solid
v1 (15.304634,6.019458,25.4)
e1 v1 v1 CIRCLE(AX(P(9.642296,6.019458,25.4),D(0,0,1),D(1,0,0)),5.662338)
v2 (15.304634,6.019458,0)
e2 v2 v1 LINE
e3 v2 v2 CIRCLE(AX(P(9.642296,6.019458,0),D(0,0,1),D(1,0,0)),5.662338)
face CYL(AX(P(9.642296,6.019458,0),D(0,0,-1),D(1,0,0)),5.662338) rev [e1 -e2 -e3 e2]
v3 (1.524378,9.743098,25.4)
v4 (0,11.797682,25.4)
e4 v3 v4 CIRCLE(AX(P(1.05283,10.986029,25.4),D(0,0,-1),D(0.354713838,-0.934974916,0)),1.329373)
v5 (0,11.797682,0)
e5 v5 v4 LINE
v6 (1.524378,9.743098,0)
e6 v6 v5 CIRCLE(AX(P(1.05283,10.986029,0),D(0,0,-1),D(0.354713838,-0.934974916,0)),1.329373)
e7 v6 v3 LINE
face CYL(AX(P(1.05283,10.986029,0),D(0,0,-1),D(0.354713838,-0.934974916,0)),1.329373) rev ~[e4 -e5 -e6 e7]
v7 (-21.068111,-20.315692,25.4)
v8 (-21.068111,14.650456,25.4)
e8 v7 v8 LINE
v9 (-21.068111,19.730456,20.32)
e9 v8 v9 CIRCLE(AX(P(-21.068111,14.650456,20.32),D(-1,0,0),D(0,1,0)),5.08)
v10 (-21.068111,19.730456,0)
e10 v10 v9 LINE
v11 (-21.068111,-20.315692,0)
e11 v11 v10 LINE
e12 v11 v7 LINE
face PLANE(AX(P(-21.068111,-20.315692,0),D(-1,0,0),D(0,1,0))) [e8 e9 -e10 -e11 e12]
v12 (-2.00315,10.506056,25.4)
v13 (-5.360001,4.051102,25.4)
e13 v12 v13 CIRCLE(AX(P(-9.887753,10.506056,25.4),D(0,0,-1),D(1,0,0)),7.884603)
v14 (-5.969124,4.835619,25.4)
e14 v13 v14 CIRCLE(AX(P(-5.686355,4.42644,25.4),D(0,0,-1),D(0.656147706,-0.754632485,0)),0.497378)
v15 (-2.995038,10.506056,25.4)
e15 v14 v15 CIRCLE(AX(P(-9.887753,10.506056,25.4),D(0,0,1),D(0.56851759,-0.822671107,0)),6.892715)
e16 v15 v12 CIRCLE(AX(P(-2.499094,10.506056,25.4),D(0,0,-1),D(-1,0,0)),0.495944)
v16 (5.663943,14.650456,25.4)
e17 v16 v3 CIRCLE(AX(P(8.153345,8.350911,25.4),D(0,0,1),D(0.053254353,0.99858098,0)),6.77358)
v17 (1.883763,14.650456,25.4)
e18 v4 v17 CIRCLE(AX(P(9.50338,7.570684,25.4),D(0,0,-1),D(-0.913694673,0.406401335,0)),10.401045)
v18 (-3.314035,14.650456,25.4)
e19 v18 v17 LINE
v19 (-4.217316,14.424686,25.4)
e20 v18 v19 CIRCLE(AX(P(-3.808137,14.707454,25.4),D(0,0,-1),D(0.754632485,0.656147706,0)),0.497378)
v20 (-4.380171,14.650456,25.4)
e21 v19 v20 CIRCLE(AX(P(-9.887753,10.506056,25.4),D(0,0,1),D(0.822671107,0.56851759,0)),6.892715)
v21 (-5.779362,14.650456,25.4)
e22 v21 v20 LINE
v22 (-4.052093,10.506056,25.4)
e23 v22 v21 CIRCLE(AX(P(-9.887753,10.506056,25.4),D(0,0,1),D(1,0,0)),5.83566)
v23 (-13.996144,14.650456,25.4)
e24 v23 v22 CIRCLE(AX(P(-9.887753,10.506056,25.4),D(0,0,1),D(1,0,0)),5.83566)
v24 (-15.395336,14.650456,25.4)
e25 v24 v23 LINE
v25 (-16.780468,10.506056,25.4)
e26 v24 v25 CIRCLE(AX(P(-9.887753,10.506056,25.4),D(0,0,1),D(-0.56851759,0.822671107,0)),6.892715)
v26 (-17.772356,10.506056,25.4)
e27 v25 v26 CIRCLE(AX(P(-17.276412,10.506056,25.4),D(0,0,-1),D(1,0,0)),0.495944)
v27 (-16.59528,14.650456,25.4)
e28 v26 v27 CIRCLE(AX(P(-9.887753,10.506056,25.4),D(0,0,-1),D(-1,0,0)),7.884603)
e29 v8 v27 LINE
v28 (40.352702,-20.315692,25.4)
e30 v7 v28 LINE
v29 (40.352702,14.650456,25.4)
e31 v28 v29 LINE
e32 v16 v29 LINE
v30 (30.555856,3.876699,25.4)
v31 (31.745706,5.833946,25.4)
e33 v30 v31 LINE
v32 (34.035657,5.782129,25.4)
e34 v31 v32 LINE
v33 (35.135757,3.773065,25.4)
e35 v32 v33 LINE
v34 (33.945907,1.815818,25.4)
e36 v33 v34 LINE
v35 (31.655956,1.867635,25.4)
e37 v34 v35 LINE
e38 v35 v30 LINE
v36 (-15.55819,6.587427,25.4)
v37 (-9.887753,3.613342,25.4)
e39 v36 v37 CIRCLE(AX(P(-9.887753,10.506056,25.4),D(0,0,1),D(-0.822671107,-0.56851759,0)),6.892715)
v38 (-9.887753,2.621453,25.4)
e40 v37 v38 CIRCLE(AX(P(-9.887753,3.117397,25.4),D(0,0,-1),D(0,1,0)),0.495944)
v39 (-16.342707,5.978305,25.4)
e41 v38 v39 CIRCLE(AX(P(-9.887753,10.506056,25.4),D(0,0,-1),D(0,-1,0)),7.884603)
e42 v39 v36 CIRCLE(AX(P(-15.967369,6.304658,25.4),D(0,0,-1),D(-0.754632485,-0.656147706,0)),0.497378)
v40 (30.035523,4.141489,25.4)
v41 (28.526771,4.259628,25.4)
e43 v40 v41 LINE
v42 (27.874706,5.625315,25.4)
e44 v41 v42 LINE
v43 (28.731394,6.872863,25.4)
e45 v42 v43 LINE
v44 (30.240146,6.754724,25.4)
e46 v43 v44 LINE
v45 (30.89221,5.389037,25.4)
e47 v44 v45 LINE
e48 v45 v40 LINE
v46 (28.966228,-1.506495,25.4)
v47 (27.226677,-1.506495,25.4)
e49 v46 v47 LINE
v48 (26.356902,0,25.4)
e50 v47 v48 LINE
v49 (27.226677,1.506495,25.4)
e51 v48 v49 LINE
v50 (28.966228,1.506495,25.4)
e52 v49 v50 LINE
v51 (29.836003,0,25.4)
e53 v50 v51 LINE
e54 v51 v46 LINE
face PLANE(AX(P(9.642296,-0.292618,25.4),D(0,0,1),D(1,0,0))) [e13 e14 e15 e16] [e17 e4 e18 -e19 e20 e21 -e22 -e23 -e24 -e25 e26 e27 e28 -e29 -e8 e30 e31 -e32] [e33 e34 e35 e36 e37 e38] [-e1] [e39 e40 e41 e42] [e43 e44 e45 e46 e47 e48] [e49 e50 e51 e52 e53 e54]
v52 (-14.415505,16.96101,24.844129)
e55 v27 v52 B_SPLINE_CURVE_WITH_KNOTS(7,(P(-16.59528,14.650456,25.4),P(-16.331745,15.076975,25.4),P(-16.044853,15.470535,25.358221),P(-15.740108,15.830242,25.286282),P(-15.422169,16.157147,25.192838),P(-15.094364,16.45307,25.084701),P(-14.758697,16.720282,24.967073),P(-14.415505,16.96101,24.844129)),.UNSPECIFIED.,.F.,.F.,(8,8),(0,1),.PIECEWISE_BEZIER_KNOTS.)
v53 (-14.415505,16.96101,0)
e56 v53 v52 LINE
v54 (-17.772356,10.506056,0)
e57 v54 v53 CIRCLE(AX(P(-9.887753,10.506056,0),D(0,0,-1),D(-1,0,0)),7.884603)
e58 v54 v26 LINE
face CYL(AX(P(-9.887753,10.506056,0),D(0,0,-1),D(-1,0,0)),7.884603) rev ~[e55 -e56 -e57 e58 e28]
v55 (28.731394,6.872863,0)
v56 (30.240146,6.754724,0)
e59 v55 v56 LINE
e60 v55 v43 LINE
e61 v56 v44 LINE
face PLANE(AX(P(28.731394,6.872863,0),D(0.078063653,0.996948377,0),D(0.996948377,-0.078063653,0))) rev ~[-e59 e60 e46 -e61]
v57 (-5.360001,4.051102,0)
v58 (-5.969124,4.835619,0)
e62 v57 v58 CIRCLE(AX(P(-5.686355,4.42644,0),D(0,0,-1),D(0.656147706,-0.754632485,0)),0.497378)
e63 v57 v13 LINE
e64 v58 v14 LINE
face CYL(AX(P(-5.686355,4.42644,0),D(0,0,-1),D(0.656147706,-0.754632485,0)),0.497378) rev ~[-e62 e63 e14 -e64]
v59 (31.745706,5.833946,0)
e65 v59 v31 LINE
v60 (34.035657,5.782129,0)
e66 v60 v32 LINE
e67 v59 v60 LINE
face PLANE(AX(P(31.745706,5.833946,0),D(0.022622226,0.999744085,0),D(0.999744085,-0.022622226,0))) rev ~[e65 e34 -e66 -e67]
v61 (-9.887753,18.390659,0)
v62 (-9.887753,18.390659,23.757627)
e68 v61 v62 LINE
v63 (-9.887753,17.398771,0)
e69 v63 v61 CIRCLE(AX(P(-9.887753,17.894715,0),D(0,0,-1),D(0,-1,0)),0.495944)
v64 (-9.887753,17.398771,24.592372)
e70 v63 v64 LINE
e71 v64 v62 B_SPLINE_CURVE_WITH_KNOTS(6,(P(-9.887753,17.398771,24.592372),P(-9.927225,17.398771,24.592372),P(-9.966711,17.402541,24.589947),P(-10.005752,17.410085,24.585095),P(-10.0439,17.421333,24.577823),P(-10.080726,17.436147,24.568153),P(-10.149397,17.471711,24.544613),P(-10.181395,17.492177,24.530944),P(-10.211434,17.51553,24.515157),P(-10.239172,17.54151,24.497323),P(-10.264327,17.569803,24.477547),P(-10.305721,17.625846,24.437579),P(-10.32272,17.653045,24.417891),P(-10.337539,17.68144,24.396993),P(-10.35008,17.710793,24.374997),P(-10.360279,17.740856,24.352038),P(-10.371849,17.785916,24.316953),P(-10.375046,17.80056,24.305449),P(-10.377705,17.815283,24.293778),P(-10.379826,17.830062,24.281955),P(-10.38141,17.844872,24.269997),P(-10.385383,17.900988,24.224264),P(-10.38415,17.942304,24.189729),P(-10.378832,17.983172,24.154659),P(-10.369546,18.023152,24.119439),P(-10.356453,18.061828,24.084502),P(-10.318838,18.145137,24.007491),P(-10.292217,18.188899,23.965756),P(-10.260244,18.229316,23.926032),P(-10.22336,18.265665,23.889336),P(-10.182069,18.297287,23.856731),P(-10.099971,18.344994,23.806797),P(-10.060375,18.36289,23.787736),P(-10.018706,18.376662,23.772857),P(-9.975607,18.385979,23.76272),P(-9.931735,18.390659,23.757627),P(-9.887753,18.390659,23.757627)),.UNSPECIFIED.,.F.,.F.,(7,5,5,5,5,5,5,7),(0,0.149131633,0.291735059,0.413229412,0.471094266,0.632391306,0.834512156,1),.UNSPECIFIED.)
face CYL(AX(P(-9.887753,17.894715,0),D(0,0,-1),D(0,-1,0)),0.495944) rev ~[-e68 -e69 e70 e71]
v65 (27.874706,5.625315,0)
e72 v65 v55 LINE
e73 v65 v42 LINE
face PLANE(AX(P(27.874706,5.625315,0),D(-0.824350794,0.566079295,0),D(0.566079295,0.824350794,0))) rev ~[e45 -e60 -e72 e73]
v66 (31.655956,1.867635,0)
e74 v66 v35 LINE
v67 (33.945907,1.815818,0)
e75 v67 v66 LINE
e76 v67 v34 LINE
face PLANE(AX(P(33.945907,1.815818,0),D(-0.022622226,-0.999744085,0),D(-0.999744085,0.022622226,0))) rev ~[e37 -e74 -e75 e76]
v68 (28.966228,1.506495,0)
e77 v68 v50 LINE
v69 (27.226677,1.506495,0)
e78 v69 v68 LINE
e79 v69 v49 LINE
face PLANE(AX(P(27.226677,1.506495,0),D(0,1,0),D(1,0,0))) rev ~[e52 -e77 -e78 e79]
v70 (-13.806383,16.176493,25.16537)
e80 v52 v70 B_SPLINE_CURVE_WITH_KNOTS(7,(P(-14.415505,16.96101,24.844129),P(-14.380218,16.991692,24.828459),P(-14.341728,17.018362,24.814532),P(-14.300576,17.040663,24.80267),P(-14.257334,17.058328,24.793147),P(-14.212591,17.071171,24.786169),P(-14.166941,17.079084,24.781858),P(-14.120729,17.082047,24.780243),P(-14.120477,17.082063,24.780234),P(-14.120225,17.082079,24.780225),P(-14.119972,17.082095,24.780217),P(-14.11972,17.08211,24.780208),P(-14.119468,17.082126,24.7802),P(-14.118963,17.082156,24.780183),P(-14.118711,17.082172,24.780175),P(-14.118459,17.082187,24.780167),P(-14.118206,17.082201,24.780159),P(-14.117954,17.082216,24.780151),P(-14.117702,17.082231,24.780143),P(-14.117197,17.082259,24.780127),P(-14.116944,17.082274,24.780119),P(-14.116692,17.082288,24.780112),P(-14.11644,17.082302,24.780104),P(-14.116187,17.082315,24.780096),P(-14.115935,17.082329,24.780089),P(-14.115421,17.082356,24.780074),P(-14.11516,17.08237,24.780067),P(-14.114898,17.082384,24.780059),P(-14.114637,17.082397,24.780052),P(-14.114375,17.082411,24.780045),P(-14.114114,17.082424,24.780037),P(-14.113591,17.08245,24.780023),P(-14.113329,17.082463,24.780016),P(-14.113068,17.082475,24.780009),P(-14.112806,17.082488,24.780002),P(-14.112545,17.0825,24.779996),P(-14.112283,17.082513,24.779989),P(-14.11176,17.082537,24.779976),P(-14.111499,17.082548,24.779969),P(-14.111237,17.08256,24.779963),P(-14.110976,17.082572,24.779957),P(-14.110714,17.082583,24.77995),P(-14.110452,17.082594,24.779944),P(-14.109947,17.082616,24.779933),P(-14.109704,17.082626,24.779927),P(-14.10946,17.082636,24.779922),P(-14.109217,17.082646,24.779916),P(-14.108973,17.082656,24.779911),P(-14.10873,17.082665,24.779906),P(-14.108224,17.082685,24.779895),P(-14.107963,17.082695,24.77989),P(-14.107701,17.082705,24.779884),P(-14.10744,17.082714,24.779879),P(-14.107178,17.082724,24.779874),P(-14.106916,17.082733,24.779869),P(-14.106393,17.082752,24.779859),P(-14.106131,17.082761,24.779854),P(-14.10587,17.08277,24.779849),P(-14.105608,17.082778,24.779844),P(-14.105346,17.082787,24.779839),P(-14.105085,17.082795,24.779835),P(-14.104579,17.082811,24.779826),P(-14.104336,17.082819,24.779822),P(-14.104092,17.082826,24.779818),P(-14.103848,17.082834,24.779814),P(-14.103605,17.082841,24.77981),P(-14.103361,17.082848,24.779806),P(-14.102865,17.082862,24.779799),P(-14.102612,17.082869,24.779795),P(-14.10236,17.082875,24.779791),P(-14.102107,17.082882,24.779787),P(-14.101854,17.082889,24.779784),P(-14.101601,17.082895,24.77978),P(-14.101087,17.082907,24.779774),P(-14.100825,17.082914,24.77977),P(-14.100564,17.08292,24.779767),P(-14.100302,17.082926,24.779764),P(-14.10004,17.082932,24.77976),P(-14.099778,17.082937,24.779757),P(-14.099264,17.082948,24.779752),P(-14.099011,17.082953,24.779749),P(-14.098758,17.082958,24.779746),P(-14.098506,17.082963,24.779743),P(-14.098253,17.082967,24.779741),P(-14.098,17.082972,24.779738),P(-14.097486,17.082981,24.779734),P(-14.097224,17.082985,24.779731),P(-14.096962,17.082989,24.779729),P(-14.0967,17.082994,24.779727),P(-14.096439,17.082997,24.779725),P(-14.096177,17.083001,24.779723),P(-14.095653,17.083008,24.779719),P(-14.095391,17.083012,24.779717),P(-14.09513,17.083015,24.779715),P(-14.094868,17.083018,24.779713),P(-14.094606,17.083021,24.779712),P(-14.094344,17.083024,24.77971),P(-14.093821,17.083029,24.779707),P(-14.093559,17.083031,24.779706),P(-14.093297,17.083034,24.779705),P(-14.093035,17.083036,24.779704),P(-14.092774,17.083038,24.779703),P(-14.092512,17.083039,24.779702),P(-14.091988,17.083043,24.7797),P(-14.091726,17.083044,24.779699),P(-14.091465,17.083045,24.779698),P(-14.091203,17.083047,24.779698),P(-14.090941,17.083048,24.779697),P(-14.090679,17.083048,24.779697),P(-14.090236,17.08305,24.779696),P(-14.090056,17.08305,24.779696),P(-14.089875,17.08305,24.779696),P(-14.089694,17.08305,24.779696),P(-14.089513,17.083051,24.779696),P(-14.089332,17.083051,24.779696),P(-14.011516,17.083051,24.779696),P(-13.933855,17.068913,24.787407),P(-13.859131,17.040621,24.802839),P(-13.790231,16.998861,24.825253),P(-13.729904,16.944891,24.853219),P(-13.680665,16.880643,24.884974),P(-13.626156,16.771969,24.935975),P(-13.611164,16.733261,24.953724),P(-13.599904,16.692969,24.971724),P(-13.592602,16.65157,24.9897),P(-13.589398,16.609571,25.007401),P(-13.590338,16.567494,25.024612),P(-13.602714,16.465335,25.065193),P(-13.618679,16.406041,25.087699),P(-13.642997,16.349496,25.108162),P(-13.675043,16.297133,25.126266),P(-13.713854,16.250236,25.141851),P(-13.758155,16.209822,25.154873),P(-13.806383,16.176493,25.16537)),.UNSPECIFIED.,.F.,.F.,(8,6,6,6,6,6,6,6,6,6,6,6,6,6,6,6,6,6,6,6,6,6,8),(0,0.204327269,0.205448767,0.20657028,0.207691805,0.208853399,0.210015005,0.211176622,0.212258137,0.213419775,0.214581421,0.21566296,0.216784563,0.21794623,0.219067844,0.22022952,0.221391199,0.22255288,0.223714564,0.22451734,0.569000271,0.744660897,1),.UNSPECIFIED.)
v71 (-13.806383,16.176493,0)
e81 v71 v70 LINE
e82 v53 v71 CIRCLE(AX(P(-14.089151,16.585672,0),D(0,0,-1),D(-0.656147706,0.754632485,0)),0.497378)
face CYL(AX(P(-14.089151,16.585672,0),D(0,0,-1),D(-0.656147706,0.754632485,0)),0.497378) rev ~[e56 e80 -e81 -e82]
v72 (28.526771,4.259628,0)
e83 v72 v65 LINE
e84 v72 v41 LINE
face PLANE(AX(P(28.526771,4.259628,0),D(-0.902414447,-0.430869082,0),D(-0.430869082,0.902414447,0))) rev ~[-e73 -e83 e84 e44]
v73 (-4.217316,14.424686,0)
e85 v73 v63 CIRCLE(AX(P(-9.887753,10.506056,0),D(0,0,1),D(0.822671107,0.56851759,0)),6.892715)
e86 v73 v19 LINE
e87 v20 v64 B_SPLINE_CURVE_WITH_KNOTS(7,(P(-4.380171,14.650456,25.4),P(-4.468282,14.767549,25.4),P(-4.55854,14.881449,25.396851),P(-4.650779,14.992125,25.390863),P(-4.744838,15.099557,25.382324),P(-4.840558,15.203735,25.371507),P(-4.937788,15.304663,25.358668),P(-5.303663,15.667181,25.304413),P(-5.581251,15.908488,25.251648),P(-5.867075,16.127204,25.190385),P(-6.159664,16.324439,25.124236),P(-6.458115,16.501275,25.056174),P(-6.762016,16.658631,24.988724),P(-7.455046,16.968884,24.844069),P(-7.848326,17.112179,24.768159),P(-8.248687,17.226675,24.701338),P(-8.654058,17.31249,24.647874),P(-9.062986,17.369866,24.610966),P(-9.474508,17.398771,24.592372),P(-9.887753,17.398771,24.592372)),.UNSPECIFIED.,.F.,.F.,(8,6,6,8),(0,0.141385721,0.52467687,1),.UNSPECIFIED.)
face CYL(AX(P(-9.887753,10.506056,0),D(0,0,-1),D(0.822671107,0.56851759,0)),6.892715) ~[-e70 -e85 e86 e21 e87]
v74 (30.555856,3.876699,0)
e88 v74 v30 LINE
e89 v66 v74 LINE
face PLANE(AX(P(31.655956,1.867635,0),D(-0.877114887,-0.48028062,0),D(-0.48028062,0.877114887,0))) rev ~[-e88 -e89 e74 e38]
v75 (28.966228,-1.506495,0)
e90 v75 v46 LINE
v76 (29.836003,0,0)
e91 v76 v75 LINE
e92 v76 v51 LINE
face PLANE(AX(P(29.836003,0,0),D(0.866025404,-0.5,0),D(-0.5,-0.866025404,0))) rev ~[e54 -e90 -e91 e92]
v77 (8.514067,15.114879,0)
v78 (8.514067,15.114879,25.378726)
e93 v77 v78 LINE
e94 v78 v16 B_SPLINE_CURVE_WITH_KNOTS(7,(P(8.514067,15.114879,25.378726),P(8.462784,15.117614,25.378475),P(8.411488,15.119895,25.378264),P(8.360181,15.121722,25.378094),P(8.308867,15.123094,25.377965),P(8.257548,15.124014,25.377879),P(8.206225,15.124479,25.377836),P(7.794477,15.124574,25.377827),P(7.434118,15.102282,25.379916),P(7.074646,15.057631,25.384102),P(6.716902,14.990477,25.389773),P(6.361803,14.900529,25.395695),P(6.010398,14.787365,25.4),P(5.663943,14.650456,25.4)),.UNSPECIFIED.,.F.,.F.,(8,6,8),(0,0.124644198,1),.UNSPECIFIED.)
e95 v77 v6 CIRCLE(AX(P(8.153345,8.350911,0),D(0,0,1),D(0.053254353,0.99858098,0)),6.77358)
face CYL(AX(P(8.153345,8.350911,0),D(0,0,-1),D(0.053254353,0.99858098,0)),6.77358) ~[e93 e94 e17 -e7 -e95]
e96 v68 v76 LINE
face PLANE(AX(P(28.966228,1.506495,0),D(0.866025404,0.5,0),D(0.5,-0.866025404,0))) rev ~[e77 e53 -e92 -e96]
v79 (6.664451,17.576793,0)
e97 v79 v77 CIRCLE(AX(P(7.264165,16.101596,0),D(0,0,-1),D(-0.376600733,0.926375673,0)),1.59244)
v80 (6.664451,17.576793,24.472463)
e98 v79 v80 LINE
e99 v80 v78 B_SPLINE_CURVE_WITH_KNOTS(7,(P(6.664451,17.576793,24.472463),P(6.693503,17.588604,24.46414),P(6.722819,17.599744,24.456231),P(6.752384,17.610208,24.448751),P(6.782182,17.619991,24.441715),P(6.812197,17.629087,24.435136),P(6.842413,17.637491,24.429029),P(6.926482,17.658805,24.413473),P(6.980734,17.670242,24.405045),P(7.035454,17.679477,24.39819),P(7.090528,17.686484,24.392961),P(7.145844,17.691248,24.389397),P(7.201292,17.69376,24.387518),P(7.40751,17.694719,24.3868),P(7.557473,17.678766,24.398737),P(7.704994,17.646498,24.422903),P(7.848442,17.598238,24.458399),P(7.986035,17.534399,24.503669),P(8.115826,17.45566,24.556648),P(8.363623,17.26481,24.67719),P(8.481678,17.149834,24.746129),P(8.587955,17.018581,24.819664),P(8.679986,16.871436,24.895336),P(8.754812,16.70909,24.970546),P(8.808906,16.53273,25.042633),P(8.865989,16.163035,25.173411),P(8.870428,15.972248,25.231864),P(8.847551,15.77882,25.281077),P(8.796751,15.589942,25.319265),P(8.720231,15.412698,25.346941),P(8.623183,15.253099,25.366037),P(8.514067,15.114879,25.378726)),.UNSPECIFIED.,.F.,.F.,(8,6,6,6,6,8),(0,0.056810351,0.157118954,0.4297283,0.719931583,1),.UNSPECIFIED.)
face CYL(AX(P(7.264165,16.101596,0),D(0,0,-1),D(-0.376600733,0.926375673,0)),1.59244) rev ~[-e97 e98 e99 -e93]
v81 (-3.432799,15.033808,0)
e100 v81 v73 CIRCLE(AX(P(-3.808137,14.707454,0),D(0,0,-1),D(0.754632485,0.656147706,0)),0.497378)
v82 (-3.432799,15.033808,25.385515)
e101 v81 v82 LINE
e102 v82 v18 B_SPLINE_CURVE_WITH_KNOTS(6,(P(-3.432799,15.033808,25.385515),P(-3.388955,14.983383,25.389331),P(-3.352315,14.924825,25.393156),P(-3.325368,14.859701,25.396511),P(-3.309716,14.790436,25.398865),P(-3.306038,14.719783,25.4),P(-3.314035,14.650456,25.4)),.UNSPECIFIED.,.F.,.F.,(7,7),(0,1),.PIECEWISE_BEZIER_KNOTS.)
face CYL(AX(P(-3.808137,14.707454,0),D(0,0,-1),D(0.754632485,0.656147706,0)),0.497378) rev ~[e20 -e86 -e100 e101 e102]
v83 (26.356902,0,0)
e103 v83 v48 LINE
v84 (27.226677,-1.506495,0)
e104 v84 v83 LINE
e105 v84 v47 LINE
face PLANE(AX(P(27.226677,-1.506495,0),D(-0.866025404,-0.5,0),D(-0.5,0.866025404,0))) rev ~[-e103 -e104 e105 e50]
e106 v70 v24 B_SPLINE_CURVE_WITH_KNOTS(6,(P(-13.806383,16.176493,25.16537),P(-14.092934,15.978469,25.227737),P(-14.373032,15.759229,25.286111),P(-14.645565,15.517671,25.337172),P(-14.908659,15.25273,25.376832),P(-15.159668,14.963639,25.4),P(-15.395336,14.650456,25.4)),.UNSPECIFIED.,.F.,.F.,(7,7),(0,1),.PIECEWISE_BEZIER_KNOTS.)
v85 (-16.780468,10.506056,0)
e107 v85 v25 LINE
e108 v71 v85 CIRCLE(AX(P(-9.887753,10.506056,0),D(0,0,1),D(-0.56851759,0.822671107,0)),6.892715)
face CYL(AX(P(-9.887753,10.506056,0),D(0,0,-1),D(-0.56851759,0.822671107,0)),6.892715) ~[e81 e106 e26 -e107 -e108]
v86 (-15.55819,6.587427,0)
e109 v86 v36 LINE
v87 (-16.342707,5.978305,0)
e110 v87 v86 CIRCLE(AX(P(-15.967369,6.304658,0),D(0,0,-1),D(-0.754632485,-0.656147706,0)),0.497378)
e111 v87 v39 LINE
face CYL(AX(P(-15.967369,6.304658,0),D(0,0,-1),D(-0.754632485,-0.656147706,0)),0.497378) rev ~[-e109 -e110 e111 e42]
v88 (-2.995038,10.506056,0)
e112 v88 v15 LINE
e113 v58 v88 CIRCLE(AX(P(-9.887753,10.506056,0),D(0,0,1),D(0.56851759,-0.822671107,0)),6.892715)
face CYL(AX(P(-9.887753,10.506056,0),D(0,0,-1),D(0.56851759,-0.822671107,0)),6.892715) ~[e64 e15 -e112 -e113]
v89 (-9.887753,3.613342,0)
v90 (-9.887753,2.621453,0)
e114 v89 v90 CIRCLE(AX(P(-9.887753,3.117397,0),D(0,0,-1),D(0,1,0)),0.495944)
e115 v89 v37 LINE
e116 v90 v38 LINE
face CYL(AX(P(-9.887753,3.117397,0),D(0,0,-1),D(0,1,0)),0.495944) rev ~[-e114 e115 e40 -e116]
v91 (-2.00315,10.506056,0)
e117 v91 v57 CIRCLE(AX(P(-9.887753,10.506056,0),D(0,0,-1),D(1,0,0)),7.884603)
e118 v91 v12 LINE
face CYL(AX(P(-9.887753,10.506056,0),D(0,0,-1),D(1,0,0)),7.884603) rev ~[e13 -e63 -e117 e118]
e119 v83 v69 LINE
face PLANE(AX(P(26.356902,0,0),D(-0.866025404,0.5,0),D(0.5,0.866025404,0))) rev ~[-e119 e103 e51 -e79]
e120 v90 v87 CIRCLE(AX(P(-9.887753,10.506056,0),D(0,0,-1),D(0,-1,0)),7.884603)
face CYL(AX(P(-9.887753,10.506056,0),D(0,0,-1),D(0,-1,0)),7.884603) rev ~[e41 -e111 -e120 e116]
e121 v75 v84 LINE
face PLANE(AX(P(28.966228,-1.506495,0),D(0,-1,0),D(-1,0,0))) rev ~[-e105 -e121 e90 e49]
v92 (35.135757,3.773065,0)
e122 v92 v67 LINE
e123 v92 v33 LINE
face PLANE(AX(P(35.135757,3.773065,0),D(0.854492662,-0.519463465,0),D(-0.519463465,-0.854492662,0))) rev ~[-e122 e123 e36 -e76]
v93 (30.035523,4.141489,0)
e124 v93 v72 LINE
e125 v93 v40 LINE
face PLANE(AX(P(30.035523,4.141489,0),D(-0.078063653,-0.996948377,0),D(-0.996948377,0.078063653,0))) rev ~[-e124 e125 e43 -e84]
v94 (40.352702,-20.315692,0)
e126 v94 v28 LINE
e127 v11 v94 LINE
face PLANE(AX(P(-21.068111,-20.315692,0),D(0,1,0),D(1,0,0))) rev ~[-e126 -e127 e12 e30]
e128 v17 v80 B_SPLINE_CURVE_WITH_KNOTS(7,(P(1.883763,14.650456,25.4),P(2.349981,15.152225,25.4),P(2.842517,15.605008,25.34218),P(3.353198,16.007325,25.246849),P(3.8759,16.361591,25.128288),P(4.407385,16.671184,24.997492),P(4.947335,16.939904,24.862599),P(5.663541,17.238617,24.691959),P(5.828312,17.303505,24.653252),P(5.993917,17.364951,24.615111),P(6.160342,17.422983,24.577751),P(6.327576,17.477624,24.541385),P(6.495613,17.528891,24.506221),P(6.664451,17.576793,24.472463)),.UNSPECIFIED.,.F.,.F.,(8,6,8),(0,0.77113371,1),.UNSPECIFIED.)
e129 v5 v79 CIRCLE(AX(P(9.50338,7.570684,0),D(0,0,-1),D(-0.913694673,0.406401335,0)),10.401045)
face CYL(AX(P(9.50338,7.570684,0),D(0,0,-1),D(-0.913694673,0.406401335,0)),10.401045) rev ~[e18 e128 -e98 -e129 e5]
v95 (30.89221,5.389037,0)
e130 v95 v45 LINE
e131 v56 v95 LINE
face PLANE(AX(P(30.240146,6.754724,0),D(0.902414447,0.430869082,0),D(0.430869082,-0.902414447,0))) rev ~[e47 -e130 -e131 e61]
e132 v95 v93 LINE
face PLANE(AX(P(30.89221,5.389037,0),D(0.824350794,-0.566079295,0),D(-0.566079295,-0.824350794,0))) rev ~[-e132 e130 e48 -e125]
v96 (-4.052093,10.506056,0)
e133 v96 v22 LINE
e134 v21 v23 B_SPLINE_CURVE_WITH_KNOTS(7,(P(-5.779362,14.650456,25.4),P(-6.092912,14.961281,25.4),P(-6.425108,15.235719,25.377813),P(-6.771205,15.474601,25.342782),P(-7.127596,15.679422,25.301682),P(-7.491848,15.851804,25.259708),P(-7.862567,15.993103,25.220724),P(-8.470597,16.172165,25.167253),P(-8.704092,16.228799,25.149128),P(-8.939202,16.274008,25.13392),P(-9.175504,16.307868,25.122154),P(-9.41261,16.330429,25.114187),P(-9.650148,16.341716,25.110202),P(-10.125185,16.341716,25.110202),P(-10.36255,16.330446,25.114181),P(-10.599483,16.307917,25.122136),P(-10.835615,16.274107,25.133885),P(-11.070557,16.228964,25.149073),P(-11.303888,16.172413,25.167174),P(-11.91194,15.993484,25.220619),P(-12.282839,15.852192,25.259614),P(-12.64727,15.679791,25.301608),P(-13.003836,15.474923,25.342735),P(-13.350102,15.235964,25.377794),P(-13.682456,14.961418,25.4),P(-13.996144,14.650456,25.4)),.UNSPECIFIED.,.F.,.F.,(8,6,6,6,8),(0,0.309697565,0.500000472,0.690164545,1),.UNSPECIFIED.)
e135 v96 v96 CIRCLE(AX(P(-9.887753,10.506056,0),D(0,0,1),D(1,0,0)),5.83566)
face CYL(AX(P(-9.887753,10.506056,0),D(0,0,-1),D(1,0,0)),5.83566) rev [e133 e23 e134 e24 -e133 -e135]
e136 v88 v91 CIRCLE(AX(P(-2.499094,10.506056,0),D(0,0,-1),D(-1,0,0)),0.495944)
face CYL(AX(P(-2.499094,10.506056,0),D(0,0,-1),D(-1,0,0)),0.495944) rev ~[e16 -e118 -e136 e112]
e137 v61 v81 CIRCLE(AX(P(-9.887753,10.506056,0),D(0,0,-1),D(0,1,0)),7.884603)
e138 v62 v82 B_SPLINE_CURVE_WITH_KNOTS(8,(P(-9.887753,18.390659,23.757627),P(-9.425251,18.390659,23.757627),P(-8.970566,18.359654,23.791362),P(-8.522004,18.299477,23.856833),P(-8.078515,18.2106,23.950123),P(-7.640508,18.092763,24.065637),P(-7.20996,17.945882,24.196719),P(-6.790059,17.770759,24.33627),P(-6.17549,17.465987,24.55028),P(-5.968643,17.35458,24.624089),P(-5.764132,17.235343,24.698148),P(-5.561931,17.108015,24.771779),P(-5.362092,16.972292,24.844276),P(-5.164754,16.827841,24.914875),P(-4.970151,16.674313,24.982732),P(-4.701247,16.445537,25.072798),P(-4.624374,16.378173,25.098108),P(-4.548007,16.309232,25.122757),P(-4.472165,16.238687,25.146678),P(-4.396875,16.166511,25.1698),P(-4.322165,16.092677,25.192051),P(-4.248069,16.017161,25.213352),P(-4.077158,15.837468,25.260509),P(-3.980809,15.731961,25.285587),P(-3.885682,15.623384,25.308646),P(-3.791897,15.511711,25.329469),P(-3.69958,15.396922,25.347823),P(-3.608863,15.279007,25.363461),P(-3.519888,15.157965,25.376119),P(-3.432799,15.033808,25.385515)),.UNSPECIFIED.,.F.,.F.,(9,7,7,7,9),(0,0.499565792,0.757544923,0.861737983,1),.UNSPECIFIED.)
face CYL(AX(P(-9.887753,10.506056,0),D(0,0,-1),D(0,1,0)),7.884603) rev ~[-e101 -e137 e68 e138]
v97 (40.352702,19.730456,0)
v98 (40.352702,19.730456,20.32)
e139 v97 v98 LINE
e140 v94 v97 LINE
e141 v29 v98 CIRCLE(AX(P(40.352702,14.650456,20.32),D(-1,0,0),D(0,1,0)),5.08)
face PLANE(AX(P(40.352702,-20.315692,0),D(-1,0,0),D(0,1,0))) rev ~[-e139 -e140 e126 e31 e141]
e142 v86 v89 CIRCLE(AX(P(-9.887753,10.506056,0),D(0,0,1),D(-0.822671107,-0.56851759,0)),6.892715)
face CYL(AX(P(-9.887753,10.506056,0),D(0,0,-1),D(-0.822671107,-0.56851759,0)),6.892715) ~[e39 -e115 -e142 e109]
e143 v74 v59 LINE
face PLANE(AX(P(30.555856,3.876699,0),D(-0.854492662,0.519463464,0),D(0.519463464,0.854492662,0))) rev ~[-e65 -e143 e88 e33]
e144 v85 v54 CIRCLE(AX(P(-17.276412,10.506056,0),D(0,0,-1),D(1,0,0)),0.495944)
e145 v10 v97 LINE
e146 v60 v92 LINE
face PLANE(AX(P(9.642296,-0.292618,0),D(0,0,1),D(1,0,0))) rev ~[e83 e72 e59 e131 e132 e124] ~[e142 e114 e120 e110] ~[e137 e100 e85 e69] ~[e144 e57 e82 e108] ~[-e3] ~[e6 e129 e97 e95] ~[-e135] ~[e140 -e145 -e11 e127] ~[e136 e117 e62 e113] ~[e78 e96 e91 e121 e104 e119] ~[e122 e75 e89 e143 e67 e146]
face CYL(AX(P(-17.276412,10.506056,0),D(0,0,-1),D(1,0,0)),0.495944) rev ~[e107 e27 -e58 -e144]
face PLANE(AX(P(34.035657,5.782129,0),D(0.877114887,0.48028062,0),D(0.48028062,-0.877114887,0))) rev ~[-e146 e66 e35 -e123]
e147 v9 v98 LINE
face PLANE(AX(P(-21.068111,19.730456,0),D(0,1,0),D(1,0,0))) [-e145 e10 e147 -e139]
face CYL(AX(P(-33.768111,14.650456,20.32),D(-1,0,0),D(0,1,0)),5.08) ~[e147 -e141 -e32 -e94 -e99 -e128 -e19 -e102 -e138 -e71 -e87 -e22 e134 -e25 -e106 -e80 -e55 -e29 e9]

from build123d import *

# Parameters (mm, degrees)
F0_W        = 61.4208132029
F0_H        = 40.0461480021
F0_R        = 5.8356598506
F0_R_2      = 5.6623382773
F1_DEPTH    = 25.4
F2_T1_DEPTH = 86.8208132029


# Not quite as in the source:
# - a fillet or chamfer that OpenCascade refuses, or shapes differently, is made with other operations: its cross-section is extruded or revolved along the edge and cut away or added


with BuildPart() as f1:
    # F0 (on Top) → F1 (new body)
    with BuildSketch(Plane.XY):
        with Locations((9.6422955394, -0.2926178277)):
            Rectangle(F0_W, F0_H)
        with BuildLine():
            ThreePointArc((-15.5581902422, 6.5874267261), (-13.0892777006, 4.4019793182), (-9.8877530545, 3.6133415997))
            ThreePointArc((-9.8877530545, 3.6133415997), (-9.3918088824, 3.1173974276), (-9.8877530545, 2.6214532554))
            ThreePointArc((-9.8877530545, 2.6214532554), (-13.525571131, 3.5108261592), (-16.3427069667, 5.9783046702))
            ThreePointArc((-16.3427069667, 5.9783046702), (-16.2723997648, 6.6975216235), (-15.5581902422, 6.5874267261))
        make_face(mode=Mode.SUBTRACT)
        with BuildLine():
            ThreePointArc((-5.9691235315, 4.8356190614), (-3.7836761236, 7.304531603), (-2.9950384051, 10.5060562491))
            ThreePointArc((-2.9950384051, 10.5060562491), (-2.4990942329, 11.0020004213), (-2.0031500608, 10.5060562491))
            ThreePointArc((-2.0031500608, 10.5060562491), (-2.8925229646, 6.8682381727), (-5.3600014756, 4.051102337))
            ThreePointArc((-5.3600014756, 4.051102337), (-6.0792184289, 4.1214095389), (-5.9691235315, 4.8356190614))
        make_face(mode=Mode.SUBTRACT)
        with BuildLine():
            ThreePointArc((-13.8063825775, 16.1764934369), (-15.9918299854, 13.7075808953), (-16.7804677039, 10.5060562491))
            ThreePointArc((-16.7804677039, 10.5060562491), (-17.2764118761, 10.010112077), (-17.7723560482, 10.5060562491))
            ThreePointArc((-17.7723560482, 10.5060562491), (-16.8829831444, 14.1438743256), (-14.4155046334, 16.9610101613))
            ThreePointArc((-14.4155046334, 16.9610101613), (-13.6962876801, 16.8907029594), (-13.8063825775, 16.1764934369))
        make_face(mode=Mode.SUBTRACT)
        with Locations((-9.8877530545, 10.5060562491)):
            Circle(F0_R, mode=Mode.SUBTRACT)
        with BuildLine():
            ThreePointArc((-9.8877530545, 17.3987708986), (-10.3836972266, 17.8947150707), (-9.8877530545, 18.3906592429))
            ThreePointArc((-9.8877530545, 18.3906592429), (-6.249934978, 17.5012863391), (-3.4327991423, 15.0338078281))
            ThreePointArc((-3.4327991423, 15.0338078281), (-3.5031063442, 14.3145908748), (-4.2173158668, 14.4246857722))
            ThreePointArc((-4.2173158668, 14.4246857722), (-6.6862284084, 16.6101331801), (-9.8877530545, 17.3987708986))
        make_face(mode=Mode.SUBTRACT)
        with BuildLine():
            ThreePointArc((6.6644512117, 17.5767932087), (8.5373270865, 17.0581119265), (8.5140671581, 15.1148792356))
            ThreePointArc((8.5140671581, 15.1148792356), (4.0257871944, 13.7216332626), (1.5243776143, 9.7430981696))
            ThreePointArc((1.5243776143, 9.7430981696), (-0.0147844439, 10.1939229676), (0, 11.7976823822))
            ThreePointArc((0, 11.7976823822), (2.6892272592, 15.4287413311), (6.6644512117, 17.5767932087))
        make_face(mode=Mode.SUBTRACT)
        with Locations((9.6422955394, 6.0194581747)):
            Circle(F0_R_2, mode=Mode.SUBTRACT)
        Polygon((28.9662275463, 1.5064948219), (29.8360027373, 0), (28.9662275463, -1.5064948219), (27.2266771644, -1.5064948219), (26.3569019735, 0), (27.2266771644, 1.5064948219), align=None, mode=Mode.SUBTRACT)
        Polygon((33.9459068477, 1.8158181313), (31.6559560597, 1.8676351756), (30.5558555424, 3.8766992536), (31.7457058131, 5.8339462873), (34.0356566012, 5.782129243), (35.1357571185, 3.773065165), align=None, mode=Mode.SUBTRACT)
        Polygon((30.2401456875, 6.7547236703), (30.8922100812, 5.3890366107), (30.0355225909, 4.141488751), (28.5267707068, 4.259627951), (27.874706313, 5.6253150105), (28.7313938034, 6.8728628702), align=None, mode=Mode.SUBTRACT)
    extrude(amount=F1_DEPTH)

    # F2: fillet of radius 5.08 on 1 edges, made by hand

    # F2_s2 → F2_t1 (cut)
    with BuildSketch(Plane.YZ.offset(-33.768111062)):
        with BuildLine():
            ThreePointArc((19.7304561734, 20.32), (18.2425586218, 23.9121024484), (14.6504561734, 25.4))
            Line((14.6504561734, 25.4), (19.7304561734, 25.4))
            Line((19.7304561734, 25.4), (19.7304561734, 20.32))
        make_face()
    extrude(amount=F2_T1_DEPTH, mode=Mode.SUBTRACT)


solid = f1.part
